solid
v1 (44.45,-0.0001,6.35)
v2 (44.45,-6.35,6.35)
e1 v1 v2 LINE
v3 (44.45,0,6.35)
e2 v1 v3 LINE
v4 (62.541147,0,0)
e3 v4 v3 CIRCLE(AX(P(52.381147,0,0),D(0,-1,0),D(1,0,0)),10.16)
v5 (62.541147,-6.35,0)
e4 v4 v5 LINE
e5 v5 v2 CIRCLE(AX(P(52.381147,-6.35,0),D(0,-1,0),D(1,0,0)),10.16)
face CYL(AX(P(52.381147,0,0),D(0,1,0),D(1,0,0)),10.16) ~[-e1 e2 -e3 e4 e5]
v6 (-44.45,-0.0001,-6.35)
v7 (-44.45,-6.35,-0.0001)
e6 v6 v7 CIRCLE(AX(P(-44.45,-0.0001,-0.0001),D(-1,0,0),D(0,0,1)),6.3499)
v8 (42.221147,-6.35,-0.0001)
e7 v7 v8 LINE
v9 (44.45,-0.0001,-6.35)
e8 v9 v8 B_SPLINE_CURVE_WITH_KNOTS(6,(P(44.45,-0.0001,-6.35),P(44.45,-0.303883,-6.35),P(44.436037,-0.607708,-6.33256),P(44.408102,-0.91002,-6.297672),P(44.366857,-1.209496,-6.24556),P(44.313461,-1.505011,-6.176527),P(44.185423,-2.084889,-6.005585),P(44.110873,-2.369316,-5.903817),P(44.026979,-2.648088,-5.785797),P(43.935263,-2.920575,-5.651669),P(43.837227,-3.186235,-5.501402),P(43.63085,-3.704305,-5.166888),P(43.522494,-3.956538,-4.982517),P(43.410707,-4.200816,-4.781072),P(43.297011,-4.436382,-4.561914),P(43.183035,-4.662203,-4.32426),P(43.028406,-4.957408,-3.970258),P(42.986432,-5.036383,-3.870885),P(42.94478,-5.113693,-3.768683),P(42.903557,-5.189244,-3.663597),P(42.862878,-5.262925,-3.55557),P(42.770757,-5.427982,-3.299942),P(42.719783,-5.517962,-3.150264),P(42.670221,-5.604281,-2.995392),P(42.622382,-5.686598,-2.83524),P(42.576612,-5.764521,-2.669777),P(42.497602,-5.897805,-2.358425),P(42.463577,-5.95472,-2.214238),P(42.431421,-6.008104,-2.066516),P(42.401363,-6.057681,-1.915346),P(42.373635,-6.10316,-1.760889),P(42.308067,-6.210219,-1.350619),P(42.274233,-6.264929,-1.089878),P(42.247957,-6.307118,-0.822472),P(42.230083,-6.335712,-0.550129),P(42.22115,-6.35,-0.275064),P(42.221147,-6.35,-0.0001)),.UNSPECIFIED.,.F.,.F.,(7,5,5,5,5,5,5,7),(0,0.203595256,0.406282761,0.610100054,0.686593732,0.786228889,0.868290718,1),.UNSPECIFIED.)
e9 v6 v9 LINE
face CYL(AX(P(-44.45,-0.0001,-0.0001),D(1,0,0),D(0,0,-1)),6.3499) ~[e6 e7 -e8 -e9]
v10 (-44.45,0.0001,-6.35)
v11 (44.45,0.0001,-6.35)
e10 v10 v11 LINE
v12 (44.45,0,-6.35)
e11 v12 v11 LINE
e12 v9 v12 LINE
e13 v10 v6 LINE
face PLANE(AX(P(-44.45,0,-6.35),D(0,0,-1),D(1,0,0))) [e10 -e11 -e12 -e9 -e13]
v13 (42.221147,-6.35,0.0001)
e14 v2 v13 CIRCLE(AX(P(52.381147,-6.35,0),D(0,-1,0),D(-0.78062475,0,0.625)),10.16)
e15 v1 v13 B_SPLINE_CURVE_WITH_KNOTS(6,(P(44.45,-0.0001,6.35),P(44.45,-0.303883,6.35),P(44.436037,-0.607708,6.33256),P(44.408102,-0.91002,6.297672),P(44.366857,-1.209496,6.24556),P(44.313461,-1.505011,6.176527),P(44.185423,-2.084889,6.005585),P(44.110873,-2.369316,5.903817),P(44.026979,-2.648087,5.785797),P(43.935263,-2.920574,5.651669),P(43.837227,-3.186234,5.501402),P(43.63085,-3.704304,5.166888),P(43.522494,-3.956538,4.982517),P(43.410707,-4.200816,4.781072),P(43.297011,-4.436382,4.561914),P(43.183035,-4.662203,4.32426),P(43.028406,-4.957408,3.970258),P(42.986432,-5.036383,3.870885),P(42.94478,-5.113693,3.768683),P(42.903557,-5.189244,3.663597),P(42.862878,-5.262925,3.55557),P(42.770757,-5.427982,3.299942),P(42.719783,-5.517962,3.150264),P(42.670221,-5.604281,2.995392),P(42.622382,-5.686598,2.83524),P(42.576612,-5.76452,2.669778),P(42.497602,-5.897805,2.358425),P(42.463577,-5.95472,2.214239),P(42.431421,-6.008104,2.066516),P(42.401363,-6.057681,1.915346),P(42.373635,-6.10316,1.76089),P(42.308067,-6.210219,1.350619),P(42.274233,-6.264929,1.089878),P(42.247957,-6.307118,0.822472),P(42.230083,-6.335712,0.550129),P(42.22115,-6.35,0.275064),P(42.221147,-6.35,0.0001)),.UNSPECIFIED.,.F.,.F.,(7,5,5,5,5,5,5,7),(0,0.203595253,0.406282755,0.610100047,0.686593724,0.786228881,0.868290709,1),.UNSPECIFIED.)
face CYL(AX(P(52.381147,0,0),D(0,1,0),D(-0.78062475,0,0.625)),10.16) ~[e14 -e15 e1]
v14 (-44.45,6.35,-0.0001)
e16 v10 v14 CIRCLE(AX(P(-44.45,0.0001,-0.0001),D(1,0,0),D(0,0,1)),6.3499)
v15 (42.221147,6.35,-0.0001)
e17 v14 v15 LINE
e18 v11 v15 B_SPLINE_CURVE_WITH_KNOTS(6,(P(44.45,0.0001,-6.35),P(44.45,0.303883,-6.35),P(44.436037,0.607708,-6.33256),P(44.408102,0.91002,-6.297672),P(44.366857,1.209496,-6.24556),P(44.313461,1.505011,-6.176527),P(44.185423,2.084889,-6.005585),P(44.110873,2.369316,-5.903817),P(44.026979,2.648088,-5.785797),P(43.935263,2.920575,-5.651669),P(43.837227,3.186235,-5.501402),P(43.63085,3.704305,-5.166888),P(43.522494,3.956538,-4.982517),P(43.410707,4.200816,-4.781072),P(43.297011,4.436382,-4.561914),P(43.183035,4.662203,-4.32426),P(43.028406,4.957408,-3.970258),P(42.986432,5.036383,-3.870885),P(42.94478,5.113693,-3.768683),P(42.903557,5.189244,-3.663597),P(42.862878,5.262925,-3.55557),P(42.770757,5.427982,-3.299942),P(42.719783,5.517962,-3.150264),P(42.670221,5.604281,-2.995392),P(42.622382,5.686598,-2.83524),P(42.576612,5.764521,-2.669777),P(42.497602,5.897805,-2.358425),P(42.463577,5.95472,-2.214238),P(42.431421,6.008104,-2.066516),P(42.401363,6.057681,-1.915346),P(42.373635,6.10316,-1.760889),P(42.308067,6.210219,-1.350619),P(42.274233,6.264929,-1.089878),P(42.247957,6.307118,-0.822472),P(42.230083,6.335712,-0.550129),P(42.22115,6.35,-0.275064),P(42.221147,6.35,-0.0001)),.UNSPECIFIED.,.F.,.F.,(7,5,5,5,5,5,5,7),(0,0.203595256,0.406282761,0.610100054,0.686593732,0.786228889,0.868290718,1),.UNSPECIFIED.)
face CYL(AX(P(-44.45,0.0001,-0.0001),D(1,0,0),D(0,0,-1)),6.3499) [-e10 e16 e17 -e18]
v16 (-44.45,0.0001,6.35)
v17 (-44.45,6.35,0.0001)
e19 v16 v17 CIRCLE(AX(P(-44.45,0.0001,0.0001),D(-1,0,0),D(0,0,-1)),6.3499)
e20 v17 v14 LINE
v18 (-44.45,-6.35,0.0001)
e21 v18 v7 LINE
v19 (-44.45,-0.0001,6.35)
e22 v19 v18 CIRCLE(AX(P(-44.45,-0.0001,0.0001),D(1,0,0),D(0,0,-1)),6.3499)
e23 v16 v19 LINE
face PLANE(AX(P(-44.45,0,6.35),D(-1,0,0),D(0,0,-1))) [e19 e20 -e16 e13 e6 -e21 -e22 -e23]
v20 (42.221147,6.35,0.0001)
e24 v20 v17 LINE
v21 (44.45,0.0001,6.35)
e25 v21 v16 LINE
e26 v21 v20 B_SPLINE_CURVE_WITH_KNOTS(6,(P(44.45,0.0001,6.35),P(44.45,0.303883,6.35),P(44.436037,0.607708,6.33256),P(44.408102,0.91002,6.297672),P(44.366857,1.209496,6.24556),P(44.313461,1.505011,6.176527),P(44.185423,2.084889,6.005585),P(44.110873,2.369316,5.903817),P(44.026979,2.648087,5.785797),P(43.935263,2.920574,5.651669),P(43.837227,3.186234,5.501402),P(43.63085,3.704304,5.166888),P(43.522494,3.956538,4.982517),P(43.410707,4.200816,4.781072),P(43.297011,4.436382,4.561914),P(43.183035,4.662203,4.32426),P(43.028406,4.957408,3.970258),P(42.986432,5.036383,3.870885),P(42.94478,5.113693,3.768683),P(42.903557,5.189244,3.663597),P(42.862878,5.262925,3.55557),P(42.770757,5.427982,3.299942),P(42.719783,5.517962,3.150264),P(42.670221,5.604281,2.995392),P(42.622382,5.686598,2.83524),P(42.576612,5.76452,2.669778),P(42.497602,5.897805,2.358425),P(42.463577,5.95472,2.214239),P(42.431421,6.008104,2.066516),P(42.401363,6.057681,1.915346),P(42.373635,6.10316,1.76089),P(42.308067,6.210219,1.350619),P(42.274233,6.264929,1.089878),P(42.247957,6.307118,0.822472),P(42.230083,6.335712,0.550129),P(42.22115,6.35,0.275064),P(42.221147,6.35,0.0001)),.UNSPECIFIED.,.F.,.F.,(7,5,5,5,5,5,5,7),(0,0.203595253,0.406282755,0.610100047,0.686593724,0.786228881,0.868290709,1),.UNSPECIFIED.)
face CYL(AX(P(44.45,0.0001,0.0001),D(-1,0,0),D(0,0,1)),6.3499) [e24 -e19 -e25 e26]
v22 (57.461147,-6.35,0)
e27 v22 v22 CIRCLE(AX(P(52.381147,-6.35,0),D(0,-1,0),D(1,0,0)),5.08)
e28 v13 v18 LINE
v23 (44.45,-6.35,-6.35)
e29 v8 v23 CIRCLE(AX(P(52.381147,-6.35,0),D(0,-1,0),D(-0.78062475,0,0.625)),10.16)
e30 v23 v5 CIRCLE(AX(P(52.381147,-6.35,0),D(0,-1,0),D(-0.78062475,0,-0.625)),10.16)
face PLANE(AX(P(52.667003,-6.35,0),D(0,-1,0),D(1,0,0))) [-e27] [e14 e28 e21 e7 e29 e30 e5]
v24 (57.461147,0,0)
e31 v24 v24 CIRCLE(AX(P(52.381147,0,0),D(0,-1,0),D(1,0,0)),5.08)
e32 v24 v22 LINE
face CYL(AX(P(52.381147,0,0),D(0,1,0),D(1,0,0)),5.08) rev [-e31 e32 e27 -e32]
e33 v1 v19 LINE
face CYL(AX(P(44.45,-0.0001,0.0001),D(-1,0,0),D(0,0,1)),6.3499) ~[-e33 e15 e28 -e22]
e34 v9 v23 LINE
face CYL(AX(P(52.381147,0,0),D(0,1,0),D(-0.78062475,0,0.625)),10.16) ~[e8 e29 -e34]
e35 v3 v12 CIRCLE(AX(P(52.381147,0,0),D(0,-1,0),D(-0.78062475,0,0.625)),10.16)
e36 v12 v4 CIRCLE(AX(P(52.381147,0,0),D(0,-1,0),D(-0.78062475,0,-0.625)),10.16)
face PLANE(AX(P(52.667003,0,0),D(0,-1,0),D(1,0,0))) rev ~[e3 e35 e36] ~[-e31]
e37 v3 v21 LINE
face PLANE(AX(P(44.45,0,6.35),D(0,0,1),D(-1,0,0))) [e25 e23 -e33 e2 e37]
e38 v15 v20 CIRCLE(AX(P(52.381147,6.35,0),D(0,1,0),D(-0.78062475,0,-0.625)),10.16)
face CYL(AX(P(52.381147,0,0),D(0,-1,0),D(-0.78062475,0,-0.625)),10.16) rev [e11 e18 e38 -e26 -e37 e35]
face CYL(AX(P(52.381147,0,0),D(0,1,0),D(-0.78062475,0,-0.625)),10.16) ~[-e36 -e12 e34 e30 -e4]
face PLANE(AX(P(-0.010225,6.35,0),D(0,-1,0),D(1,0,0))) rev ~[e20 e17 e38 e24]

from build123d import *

# Parameters (mm, degrees)
F1_DEPTH = 6.35
F2_R     = 6.3499
F0_R     = 5.08
F3_DEPTH = 6.35


# Not quite as in the source:
# - a fillet or chamfer is up to 0.001 mm smaller than in the source, because OpenCascade refuses the exact size


with BuildPart() as f1:
    # F0 (on Front) → F1 (new body, symmetric)
    with BuildSketch(Plane.XZ):
        with BuildLine():
            Line((44.45, 6.35), (-44.45, 6.35))
            ThreePointArc((-44.45, 6.35), (-42.7945407024, 3.3649028089), (-42.221147458, 0))
            ThreePointArc((-42.221147458, 0), (-42.7945407024, -3.3649028089), (-44.45, -6.35))
            Line((-44.45, -6.35), (44.45, -6.35))
            ThreePointArc((44.45, -6.35), (42.221147458, 0), (44.45, 6.35))
        make_face()
        with BuildLine():
            ThreePointArc((-42.221147458, 0), (-42.7945407024, 3.3649028089), (-44.45, 6.35))
            Line((-44.45, 6.35), (-44.45, -6.35))
            ThreePointArc((-44.45, -6.35), (-42.7945407024, -3.3649028089), (-42.221147458, 0))
        make_face()
    extrude(amount=F1_DEPTH, both=True)

    # F2 (radius 6.35 in the source; OpenCascade refuses exactly that, so slightly less here)
    f2_edges = [f1.edges().sort_by_distance(p)[0] for p in [
        (0, -6.35, 6.35),
        (0, 6.35, 6.35),
        (0, -6.35, -6.35),
        (0, 6.35, -6.35),
    ]]
    fillet(f2_edges, radius=F2_R)

    # F0 (on Front) → F3 (join)
    with BuildSketch(Plane.XZ):
        with BuildLine():
            ThreePointArc((62.541147458, 0), (55.7460502669, 9.5866067556), (44.45, 6.35))
            Line((44.45, 6.35), (44.45, -6.35))
            ThreePointArc((44.45, -6.35), (55.7460502669, -9.5866067556), (62.541147458, 0))
        make_face()
        with Locations((52.381147458, 0)):
            Circle(F0_R, mode=Mode.SUBTRACT)
        with BuildLine():
            Line((44.45, -6.35), (44.45, 6.35))
            ThreePointArc((44.45, 6.35), (42.221147458, 0), (44.45, -6.35))
        make_face()
    extrude(amount=F3_DEPTH)


solid = f1.part
